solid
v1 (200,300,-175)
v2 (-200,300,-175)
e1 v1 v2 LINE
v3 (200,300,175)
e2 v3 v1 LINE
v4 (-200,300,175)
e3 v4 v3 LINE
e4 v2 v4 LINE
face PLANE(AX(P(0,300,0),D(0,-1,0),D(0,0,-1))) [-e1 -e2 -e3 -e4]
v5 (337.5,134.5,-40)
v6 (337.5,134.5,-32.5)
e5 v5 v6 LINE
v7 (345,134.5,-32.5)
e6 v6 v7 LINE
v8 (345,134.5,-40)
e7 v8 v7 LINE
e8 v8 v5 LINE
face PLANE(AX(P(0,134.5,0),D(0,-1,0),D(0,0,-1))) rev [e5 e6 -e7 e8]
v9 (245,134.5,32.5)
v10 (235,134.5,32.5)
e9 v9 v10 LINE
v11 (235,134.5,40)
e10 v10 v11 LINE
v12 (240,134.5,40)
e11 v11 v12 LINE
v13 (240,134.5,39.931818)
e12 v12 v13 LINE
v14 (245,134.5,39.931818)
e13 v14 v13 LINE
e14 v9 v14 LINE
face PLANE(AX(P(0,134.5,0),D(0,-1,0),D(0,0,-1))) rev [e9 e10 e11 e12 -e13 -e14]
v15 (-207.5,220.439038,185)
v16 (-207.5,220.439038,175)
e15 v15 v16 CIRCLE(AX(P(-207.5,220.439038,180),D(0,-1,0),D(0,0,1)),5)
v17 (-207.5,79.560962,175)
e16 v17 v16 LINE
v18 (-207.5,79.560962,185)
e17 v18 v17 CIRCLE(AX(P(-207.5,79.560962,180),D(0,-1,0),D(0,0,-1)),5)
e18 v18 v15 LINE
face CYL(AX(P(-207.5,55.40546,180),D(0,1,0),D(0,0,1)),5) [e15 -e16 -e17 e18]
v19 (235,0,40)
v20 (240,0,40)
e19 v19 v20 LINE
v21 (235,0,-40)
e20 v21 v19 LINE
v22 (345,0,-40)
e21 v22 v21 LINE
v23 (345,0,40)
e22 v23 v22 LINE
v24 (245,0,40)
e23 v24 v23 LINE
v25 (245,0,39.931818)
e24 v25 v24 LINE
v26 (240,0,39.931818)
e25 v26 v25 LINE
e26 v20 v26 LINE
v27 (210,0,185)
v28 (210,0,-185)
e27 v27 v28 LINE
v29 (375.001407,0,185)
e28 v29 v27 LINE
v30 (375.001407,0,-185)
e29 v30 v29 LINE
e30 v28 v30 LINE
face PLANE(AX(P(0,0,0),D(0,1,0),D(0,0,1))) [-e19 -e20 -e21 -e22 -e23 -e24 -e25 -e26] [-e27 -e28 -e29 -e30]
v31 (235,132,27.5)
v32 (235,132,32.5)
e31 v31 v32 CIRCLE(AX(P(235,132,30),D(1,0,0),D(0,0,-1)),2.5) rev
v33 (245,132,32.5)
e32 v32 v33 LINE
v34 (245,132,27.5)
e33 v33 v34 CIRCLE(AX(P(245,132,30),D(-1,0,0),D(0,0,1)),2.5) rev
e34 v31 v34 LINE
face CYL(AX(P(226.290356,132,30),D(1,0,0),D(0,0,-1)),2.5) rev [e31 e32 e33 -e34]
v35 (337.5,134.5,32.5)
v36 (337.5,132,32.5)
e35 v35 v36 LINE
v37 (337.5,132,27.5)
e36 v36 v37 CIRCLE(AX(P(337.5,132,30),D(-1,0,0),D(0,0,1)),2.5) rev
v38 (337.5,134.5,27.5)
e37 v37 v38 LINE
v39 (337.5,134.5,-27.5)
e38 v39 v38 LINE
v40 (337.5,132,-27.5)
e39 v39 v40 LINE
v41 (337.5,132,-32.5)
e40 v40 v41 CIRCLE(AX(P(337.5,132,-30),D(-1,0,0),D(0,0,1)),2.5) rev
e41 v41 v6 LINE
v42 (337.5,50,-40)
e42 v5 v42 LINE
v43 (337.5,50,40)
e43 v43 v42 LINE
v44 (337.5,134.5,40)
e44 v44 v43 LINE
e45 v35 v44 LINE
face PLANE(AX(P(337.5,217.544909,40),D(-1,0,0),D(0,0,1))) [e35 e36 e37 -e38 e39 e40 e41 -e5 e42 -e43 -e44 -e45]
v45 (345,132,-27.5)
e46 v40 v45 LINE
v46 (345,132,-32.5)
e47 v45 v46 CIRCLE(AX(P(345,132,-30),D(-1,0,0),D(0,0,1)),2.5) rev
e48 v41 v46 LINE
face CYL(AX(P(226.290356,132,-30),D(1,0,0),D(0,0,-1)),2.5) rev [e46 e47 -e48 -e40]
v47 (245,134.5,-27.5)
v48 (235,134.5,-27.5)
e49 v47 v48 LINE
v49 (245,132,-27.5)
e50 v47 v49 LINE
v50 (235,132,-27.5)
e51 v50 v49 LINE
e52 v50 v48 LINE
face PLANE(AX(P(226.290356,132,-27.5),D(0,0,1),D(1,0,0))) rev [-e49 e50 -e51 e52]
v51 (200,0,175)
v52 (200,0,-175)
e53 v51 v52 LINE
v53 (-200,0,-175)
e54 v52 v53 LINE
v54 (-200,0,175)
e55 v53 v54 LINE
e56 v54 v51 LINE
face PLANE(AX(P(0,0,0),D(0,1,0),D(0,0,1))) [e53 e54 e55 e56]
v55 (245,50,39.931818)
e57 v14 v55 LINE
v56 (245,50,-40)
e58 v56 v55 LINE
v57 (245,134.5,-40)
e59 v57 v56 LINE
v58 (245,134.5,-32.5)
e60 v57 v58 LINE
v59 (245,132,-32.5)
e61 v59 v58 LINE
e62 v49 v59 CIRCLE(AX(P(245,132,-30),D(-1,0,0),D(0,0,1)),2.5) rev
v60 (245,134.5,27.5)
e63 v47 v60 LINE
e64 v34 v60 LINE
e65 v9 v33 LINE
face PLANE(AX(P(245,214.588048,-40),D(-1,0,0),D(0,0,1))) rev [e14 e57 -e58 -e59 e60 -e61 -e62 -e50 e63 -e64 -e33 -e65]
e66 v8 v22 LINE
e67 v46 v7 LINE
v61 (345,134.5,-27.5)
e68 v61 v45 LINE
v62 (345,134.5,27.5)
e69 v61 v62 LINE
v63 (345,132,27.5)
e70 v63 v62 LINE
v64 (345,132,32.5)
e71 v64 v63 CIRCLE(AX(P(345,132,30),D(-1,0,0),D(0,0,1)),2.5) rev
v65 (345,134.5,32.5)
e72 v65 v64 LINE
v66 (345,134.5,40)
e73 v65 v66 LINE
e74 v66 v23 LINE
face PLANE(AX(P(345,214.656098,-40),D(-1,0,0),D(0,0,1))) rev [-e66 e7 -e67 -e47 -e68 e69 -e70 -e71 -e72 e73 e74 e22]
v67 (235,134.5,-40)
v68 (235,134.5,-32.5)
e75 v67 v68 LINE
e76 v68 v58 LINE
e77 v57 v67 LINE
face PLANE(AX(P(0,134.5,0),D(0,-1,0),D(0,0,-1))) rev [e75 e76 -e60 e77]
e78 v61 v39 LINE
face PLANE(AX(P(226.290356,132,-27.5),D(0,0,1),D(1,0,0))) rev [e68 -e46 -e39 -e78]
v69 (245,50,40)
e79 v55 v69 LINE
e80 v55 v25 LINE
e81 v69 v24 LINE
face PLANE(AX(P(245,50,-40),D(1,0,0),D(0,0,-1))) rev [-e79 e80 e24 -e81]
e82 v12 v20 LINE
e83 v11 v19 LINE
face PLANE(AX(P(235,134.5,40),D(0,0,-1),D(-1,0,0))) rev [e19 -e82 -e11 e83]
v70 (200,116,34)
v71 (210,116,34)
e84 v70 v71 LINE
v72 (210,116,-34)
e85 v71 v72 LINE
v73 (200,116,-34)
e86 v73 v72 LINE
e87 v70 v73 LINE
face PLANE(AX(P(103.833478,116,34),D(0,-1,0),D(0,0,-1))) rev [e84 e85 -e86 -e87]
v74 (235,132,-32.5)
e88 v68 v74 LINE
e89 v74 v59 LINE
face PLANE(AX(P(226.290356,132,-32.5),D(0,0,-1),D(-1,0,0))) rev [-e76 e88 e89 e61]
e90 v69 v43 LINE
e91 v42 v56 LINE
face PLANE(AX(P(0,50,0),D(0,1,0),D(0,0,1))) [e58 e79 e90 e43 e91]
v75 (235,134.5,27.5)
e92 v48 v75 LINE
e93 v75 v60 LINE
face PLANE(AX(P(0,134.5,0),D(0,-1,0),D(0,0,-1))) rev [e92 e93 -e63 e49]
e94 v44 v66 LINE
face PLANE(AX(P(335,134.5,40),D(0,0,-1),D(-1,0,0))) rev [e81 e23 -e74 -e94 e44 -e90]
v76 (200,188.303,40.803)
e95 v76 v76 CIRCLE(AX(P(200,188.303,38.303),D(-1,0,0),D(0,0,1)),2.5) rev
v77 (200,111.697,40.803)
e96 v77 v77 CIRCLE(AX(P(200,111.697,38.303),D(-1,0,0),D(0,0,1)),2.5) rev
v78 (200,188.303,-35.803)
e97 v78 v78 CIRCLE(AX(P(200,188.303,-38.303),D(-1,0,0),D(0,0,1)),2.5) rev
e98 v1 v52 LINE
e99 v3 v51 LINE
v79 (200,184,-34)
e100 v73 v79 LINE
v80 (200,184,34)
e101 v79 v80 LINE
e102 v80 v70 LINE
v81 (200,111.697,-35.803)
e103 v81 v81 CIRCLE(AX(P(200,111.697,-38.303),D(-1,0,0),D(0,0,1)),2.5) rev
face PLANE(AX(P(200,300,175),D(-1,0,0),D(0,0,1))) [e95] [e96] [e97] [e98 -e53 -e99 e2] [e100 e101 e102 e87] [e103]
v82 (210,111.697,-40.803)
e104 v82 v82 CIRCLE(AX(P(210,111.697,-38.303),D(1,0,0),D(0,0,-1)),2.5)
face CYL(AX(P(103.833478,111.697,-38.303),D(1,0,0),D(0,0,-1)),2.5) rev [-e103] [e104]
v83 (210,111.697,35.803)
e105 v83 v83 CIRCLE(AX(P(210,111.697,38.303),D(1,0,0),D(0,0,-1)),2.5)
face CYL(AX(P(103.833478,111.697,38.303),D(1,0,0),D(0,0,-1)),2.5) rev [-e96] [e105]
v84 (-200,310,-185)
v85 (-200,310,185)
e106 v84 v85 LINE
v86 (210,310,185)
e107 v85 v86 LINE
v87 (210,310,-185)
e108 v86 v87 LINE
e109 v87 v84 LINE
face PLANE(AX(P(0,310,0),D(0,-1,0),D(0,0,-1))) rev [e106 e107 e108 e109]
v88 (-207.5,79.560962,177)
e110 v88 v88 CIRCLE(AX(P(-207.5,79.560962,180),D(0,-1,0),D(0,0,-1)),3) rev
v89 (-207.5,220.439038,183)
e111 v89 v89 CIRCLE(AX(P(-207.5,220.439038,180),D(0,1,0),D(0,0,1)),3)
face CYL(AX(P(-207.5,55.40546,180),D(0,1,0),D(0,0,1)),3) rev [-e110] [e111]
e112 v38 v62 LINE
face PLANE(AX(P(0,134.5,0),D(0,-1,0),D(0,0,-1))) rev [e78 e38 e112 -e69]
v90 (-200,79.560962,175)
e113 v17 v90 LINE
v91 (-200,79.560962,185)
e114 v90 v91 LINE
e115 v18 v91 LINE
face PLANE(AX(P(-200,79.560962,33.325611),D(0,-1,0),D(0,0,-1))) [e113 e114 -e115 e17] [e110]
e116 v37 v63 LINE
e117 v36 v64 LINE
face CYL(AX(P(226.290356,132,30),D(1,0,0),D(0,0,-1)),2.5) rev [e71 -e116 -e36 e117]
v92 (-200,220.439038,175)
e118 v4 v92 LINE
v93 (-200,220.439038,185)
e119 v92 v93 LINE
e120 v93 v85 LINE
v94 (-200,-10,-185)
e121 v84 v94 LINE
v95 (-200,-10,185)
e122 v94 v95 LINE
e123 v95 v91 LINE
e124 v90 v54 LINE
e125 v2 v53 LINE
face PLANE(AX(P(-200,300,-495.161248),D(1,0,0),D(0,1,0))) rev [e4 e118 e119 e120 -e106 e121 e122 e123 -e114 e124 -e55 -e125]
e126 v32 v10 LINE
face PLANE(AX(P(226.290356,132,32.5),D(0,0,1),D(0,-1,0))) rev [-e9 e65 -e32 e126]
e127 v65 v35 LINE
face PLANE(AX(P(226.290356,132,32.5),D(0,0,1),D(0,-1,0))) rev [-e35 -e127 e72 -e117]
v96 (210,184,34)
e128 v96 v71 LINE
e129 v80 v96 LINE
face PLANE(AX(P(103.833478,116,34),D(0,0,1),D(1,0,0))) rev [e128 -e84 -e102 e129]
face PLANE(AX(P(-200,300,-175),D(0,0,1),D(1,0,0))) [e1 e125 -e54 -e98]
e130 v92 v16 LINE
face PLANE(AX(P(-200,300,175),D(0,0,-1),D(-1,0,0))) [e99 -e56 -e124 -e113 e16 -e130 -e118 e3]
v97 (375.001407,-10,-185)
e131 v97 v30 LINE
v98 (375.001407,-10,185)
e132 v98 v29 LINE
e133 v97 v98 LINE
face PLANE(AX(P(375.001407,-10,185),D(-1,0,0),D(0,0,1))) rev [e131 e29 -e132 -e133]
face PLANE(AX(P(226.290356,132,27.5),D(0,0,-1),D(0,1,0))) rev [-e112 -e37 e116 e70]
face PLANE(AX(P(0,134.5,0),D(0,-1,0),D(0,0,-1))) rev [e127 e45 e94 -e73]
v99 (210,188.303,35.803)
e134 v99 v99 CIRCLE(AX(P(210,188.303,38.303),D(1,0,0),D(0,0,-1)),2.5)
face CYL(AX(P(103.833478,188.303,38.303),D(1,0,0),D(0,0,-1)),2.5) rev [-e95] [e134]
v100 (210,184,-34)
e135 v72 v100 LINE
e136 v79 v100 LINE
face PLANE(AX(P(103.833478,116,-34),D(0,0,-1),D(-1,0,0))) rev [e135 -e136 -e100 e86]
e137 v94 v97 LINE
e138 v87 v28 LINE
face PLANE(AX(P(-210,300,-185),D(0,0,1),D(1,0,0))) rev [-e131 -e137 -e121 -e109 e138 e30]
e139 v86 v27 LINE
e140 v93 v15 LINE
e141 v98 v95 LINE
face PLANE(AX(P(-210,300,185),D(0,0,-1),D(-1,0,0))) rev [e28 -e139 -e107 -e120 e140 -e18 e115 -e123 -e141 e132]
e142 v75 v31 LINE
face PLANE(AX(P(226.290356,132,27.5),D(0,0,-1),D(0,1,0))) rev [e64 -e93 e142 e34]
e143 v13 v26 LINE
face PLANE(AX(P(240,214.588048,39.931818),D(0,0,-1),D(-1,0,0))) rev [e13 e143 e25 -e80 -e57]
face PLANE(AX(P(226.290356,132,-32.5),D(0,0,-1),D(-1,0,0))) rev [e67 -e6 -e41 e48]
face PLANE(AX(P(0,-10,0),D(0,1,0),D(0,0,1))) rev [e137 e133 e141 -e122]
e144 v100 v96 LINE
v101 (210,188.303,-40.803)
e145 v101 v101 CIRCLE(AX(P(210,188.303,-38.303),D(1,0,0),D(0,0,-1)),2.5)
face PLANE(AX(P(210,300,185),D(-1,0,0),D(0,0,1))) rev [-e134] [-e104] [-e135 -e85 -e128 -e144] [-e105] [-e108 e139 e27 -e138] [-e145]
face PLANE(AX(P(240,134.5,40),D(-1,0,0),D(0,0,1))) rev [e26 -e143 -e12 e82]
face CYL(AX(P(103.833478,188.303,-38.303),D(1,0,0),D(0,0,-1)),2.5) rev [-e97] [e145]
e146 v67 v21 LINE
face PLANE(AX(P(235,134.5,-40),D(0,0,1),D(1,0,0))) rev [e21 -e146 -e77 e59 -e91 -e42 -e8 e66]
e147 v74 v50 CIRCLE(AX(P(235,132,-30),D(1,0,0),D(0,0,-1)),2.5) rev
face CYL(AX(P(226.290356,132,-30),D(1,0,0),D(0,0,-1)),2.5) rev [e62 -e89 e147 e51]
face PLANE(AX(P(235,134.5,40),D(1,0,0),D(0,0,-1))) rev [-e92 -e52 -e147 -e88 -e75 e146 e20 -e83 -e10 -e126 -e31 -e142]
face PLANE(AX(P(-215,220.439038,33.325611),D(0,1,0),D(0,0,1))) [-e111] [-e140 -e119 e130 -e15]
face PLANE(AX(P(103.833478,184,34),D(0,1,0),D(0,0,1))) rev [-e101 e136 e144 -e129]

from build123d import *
from build123d.topology import SkipClean

# Parameters (mm, degrees)
SKETCH1_W           = 420
SKETCH1_H           = 370
SKETCH1_W_2         = 400
SKETCH1_H_2         = 350
BOSS_EXTRUDE1_DEPTH = 300
BOSS_EXTRUDE2_DEPTH = 10
SKETCH3_W           = 10
SKETCH3_H           = 310
CUT_EXTRUDE1_DEPTH  = 370
SKETCH6_R           = 2.5
SKETCH6_W           = 68
SKETCH6_H           = 68
CUT_EXTRUDE3_DEPTH  = 10
SKETCH7_W           = 5
SKETCH7_H           = 80
BOSS_EXTRUDE3_DEPTH = 134.5
CUT_EXTRUDE4_REACH  = 646.845
SKETCH9_W           = 5
SKETCH9_H           = 79.931817825
BOSS_EXTRUDE4_DEPTH = 134.5
CUT_EXTRUDE5_REACH  = 516.637
SKETCH10_W          = 6.47899954
SKETCH10_H          = 82.791783562
SKETCH11_W          = 5
SKETCH11_H          = 80
BOSS_EXTRUDE5_DEPTH = 134.5
SKETCH12_W          = 92.5
SKETCH12_H          = 80
BOSS_EXTRUDE6_DEPTH = 50
CUT_EXTRUDE6_START  = -7.5
CUT_EXTRUDE6_DEPTH  = 105
SKETCH15_W          = 410
SKETCH15_H          = 370
BOSS_EXTRUDE7_DEPTH = 10
SKETCH16_W          = 15
SKETCH16_H          = 140.878076228
BOSS_EXTRUDE8_DEPTH = 10
SKETCH17_R          = 3
CUT_EXTRUDE7_DEPTH  = 140.878076229


with BuildPart() as part:
    # Sketch1 → Boss-Extrude1 (new body)
    with BuildSketch(Plane(origin=(0, 0, 0), x_dir=(1, 0, 0), z_dir=(0, 1, 0))):
        Rectangle(SKETCH1_W, SKETCH1_H)
        Rectangle(SKETCH1_W_2, SKETCH1_H_2, mode=Mode.SUBTRACT)
    extrude(amount=BOSS_EXTRUDE1_DEPTH)

    # Sketch2 → Boss-Extrude2 (add)
    with BuildSketch(Plane.XZ):
        Polygon((-210, -185), (210, -185), (215.001407023, -185), (375.001407023, -185), (375.001407023, 185), (215.001407023, 185), (210, 185), (-210, 185), align=None)
    extrude(amount=BOSS_EXTRUDE2_DEPTH)

    # Sketch3 → Cut-Extrude1 (cut)
    with BuildSketch(Plane.XY.offset(185)):
        with Locations((-205, 145)):
            Rectangle(SKETCH3_W, SKETCH3_H)
    extrude(amount=-CUT_EXTRUDE1_DEPTH, mode=Mode.SUBTRACT)

    # Sketch6 → Cut-Extrude3 (cut)
    with BuildSketch(Plane(origin=(210, 0, 0), x_dir=(0, 0, -1), z_dir=(1, 0, 0))):
        with Locations((-38.303, 111.697)):
            Circle(SKETCH6_R)
        with Locations((38.303, 111.697)):
            Circle(SKETCH6_R)
        with Locations((38.303, 188.303)):
            Circle(SKETCH6_R)
        with Locations((-38.303, 188.303)):
            Circle(SKETCH6_R)
        with Locations((0, 150)):
            Rectangle(SKETCH6_W, SKETCH6_H)
    extrude(amount=-CUT_EXTRUDE3_DEPTH, mode=Mode.SUBTRACT)

    # Sketch7 → Boss-Extrude3 (add)
    with BuildSketch(Plane(origin=(0, 0, 0), x_dir=(1, 0, 0), z_dir=(0, 1, 0))):
        with Locations((237.5, 0)):
            Rectangle(SKETCH7_W, SKETCH7_H)
        with Locations((337.5, 0)):
            Rectangle(SKETCH7_W, SKETCH7_H)
    extrude(amount=BOSS_EXTRUDE3_DEPTH)

    # Cut-Extrude4: up to this face of the body (flat: up to its plane)
    cut_extrude4_end = Plane(part.part.faces().sort_by_distance((235, 67.25, 0))[0])
    # Sketch8 → Cut-Extrude4 (cut, up to the picked face)
    with BuildSketch(Plane(origin=(340, 0, 0), x_dir=(0, 0, -1), z_dir=(1, 0, 0)), mode=Mode.PRIVATE) as cut_extrude4_sk1:
        with BuildLine():
            Line((-32.5, 136.110518), (-32.220758703, 136.631471953))
            Line((-32.220758703, 136.631471953), (-27.5, 136.631471953))
            Line((-27.5, 136.631471953), (-27.5, 132))
            ThreePointArc((-27.5, 132), (-30, 129.5), (-32.5, 132))
            Line((-32.5, 132), (-32.5, 136.110518))
        make_face()
    cut_extrude4_tool1 = split(extrude(cut_extrude4_sk1.sketch, amount=-CUT_EXTRUDE4_REACH, mode=Mode.PRIVATE), bisect_by=cut_extrude4_end, keep=Keep.BOTH, mode=Mode.PRIVATE)
    # Sketch8 → Cut-Extrude4 (cut, up to the picked face)
    with BuildSketch(Plane(origin=(340, 0, 0), x_dir=(0, 0, -1), z_dir=(1, 0, 0)), mode=Mode.PRIVATE) as cut_extrude4_sk2:
        with BuildLine():
            Line((27.5, 132), (27.5, 136.631471953))
            Line((27.5, 136.631471953), (32.220758703, 136.631471953))
            Line((32.220758703, 136.631471953), (32.5, 136.110518))
            Line((32.5, 136.110518), (32.5, 132))
            ThreePointArc((32.5, 132), (30, 129.5), (27.5, 132))
        make_face()
    cut_extrude4_tool2 = split(extrude(cut_extrude4_sk2.sketch, amount=-CUT_EXTRUDE4_REACH, mode=Mode.PRIVATE), bisect_by=cut_extrude4_end, keep=Keep.BOTH, mode=Mode.PRIVATE)
    add(cut_extrude4_tool1.solids().sort_by(Axis((340, 133.303425, 29.994679), (-1, 0, 0)))[0], mode=Mode.SUBTRACT)
    add(cut_extrude4_tool2.solids().sort_by(Axis((340, 133.303425, -29.994679), (-1, 0, 0)))[0], mode=Mode.SUBTRACT)

    # Sketch9 → Boss-Extrude4 (add)
    with BuildSketch(Plane(origin=(0, 0, 0), x_dir=(1, 0, 0), z_dir=(0, 1, 0))):
        with Locations((242.5, 0.034091087)):
            Rectangle(SKETCH9_W, SKETCH9_H)
    extrude(amount=BOSS_EXTRUDE4_DEPTH)

    # Cut-Extrude5: up to this face of the body (flat: up to its plane)
    cut_extrude5_end = Plane(part.part.faces().sort_by_distance((337.5, 134.5, 0))[0])
    # Sketch10 → Cut-Extrude5 (cut, up to the picked face)
    with BuildSketch(Plane(origin=(0, 0, 0), x_dir=(1, 0, 0), z_dir=(0, 1, 0)), mode=Mode.PRIVATE) as cut_extrude5_sk1:
        with Locations((334.26050023, 1.395891781)):
            Rectangle(SKETCH10_W, SKETCH10_H)
    cut_extrude5_tool1 = split(extrude(cut_extrude5_sk1.sketch, amount=CUT_EXTRUDE5_REACH, mode=Mode.PRIVATE), bisect_by=cut_extrude5_end, keep=Keep.BOTH, mode=Mode.PRIVATE)
    add(cut_extrude5_tool1.solids().sort_by(Axis((334.2605, 0, -1.395892), (0, 1, 0)))[0], mode=Mode.SUBTRACT)

    # Sketch11 → Boss-Extrude5 (add)
    with BuildSketch(Plane(origin=(0, 0, 0), x_dir=(1, 0, 0), z_dir=(0, 1, 0))):
        with Locations((342.5, 0)):
            Rectangle(SKETCH11_W, SKETCH11_H)
    extrude(amount=BOSS_EXTRUDE5_DEPTH)

    # Sketch12 → Boss-Extrude6 (add)
    with BuildSketch(Plane(origin=(0, 0, 0), x_dir=(1, 0, 0), z_dir=(0, 1, 0))):
        with Locations((291.25, 0)):
            Rectangle(SKETCH12_W, SKETCH12_H)
    extrude(amount=BOSS_EXTRUDE6_DEPTH)

    # Sketch13 → Cut-Extrude6 (cut)
    with SkipClean():  # the faces are left unmerged after this step: merging them gives an invalid solid
        with BuildSketch(Plane.ZY.offset(-337.5).offset(CUT_EXTRUDE6_START)):
            with BuildLine():
                Line((-32.5, 132), (-32.5, 134.5))
                Line((-32.5, 134.5), (-27.5, 134.5))
                Line((-27.5, 134.5), (-27.5, 132))
                ThreePointArc((-27.5, 132), (-30, 129.5), (-32.5, 132))
            make_face()
            with BuildLine():
                Line((27.5, 132), (27.5, 134.5))
                Line((27.5, 134.5), (32.5, 134.5))
                Line((32.5, 134.5), (32.5, 132))
                ThreePointArc((32.5, 132), (30, 129.5), (27.5, 132))
            make_face()
        extrude(amount=CUT_EXTRUDE6_DEPTH, mode=Mode.SUBTRACT)
    add(part.part.scale(1), mode=Mode.REPLACE)  # the faces are merged on a copy

    # Sketch15 → Boss-Extrude7 (add)
    with BuildSketch(Plane(origin=(0, 300, 0), x_dir=(1, 0, 0), z_dir=(0, 1, 0))):
        with Locations((5, 0)):
            Rectangle(SKETCH15_W, SKETCH15_H)
    extrude(amount=BOSS_EXTRUDE7_DEPTH)

    # Sketch16 → Boss-Extrude8 (add)
    with BuildSketch(Plane.XY.offset(185)):
        with Locations((-207.5, 150)):
            Rectangle(SKETCH16_W, SKETCH16_H)
    extrude(amount=-BOSS_EXTRUDE8_DEPTH)

    # Sketch17 → Cut-Extrude7 (cut)
    with BuildSketch(Plane(origin=(0, 220.439038114, 0), x_dir=(1, 0, 0), z_dir=(0, 1, 0))):
        with Locations(Location((-207.5, -180, 0), (0, 0, 270))):
            Circle(SKETCH17_R)
        with BuildLine():
            Line((-207.5, -175), (-209.035864649, -172.521100774))
            Line((-209.035864649, -172.521100774), (-216.595230293, -172.09067426))
            Line((-216.595230293, -172.09067426), (-221.114708685, -175.883807911))
            Line((-221.114708685, -175.883807911), (-223.315292371, -184.798763984))
            Line((-223.315292371, -184.798763984), (-213.821165317, -189.967050938))
            Line((-213.821165317, -189.967050938), (-207.069572146, -188.808886591))
            Line((-207.069572146, -188.808886591), (-207.5, -185))
            ThreePointArc((-207.5, -185), (-212.5, -180), (-207.5, -175))
        make_face()
    extrude(amount=-CUT_EXTRUDE7_DEPTH, mode=Mode.SUBTRACT)


solid = part.part
